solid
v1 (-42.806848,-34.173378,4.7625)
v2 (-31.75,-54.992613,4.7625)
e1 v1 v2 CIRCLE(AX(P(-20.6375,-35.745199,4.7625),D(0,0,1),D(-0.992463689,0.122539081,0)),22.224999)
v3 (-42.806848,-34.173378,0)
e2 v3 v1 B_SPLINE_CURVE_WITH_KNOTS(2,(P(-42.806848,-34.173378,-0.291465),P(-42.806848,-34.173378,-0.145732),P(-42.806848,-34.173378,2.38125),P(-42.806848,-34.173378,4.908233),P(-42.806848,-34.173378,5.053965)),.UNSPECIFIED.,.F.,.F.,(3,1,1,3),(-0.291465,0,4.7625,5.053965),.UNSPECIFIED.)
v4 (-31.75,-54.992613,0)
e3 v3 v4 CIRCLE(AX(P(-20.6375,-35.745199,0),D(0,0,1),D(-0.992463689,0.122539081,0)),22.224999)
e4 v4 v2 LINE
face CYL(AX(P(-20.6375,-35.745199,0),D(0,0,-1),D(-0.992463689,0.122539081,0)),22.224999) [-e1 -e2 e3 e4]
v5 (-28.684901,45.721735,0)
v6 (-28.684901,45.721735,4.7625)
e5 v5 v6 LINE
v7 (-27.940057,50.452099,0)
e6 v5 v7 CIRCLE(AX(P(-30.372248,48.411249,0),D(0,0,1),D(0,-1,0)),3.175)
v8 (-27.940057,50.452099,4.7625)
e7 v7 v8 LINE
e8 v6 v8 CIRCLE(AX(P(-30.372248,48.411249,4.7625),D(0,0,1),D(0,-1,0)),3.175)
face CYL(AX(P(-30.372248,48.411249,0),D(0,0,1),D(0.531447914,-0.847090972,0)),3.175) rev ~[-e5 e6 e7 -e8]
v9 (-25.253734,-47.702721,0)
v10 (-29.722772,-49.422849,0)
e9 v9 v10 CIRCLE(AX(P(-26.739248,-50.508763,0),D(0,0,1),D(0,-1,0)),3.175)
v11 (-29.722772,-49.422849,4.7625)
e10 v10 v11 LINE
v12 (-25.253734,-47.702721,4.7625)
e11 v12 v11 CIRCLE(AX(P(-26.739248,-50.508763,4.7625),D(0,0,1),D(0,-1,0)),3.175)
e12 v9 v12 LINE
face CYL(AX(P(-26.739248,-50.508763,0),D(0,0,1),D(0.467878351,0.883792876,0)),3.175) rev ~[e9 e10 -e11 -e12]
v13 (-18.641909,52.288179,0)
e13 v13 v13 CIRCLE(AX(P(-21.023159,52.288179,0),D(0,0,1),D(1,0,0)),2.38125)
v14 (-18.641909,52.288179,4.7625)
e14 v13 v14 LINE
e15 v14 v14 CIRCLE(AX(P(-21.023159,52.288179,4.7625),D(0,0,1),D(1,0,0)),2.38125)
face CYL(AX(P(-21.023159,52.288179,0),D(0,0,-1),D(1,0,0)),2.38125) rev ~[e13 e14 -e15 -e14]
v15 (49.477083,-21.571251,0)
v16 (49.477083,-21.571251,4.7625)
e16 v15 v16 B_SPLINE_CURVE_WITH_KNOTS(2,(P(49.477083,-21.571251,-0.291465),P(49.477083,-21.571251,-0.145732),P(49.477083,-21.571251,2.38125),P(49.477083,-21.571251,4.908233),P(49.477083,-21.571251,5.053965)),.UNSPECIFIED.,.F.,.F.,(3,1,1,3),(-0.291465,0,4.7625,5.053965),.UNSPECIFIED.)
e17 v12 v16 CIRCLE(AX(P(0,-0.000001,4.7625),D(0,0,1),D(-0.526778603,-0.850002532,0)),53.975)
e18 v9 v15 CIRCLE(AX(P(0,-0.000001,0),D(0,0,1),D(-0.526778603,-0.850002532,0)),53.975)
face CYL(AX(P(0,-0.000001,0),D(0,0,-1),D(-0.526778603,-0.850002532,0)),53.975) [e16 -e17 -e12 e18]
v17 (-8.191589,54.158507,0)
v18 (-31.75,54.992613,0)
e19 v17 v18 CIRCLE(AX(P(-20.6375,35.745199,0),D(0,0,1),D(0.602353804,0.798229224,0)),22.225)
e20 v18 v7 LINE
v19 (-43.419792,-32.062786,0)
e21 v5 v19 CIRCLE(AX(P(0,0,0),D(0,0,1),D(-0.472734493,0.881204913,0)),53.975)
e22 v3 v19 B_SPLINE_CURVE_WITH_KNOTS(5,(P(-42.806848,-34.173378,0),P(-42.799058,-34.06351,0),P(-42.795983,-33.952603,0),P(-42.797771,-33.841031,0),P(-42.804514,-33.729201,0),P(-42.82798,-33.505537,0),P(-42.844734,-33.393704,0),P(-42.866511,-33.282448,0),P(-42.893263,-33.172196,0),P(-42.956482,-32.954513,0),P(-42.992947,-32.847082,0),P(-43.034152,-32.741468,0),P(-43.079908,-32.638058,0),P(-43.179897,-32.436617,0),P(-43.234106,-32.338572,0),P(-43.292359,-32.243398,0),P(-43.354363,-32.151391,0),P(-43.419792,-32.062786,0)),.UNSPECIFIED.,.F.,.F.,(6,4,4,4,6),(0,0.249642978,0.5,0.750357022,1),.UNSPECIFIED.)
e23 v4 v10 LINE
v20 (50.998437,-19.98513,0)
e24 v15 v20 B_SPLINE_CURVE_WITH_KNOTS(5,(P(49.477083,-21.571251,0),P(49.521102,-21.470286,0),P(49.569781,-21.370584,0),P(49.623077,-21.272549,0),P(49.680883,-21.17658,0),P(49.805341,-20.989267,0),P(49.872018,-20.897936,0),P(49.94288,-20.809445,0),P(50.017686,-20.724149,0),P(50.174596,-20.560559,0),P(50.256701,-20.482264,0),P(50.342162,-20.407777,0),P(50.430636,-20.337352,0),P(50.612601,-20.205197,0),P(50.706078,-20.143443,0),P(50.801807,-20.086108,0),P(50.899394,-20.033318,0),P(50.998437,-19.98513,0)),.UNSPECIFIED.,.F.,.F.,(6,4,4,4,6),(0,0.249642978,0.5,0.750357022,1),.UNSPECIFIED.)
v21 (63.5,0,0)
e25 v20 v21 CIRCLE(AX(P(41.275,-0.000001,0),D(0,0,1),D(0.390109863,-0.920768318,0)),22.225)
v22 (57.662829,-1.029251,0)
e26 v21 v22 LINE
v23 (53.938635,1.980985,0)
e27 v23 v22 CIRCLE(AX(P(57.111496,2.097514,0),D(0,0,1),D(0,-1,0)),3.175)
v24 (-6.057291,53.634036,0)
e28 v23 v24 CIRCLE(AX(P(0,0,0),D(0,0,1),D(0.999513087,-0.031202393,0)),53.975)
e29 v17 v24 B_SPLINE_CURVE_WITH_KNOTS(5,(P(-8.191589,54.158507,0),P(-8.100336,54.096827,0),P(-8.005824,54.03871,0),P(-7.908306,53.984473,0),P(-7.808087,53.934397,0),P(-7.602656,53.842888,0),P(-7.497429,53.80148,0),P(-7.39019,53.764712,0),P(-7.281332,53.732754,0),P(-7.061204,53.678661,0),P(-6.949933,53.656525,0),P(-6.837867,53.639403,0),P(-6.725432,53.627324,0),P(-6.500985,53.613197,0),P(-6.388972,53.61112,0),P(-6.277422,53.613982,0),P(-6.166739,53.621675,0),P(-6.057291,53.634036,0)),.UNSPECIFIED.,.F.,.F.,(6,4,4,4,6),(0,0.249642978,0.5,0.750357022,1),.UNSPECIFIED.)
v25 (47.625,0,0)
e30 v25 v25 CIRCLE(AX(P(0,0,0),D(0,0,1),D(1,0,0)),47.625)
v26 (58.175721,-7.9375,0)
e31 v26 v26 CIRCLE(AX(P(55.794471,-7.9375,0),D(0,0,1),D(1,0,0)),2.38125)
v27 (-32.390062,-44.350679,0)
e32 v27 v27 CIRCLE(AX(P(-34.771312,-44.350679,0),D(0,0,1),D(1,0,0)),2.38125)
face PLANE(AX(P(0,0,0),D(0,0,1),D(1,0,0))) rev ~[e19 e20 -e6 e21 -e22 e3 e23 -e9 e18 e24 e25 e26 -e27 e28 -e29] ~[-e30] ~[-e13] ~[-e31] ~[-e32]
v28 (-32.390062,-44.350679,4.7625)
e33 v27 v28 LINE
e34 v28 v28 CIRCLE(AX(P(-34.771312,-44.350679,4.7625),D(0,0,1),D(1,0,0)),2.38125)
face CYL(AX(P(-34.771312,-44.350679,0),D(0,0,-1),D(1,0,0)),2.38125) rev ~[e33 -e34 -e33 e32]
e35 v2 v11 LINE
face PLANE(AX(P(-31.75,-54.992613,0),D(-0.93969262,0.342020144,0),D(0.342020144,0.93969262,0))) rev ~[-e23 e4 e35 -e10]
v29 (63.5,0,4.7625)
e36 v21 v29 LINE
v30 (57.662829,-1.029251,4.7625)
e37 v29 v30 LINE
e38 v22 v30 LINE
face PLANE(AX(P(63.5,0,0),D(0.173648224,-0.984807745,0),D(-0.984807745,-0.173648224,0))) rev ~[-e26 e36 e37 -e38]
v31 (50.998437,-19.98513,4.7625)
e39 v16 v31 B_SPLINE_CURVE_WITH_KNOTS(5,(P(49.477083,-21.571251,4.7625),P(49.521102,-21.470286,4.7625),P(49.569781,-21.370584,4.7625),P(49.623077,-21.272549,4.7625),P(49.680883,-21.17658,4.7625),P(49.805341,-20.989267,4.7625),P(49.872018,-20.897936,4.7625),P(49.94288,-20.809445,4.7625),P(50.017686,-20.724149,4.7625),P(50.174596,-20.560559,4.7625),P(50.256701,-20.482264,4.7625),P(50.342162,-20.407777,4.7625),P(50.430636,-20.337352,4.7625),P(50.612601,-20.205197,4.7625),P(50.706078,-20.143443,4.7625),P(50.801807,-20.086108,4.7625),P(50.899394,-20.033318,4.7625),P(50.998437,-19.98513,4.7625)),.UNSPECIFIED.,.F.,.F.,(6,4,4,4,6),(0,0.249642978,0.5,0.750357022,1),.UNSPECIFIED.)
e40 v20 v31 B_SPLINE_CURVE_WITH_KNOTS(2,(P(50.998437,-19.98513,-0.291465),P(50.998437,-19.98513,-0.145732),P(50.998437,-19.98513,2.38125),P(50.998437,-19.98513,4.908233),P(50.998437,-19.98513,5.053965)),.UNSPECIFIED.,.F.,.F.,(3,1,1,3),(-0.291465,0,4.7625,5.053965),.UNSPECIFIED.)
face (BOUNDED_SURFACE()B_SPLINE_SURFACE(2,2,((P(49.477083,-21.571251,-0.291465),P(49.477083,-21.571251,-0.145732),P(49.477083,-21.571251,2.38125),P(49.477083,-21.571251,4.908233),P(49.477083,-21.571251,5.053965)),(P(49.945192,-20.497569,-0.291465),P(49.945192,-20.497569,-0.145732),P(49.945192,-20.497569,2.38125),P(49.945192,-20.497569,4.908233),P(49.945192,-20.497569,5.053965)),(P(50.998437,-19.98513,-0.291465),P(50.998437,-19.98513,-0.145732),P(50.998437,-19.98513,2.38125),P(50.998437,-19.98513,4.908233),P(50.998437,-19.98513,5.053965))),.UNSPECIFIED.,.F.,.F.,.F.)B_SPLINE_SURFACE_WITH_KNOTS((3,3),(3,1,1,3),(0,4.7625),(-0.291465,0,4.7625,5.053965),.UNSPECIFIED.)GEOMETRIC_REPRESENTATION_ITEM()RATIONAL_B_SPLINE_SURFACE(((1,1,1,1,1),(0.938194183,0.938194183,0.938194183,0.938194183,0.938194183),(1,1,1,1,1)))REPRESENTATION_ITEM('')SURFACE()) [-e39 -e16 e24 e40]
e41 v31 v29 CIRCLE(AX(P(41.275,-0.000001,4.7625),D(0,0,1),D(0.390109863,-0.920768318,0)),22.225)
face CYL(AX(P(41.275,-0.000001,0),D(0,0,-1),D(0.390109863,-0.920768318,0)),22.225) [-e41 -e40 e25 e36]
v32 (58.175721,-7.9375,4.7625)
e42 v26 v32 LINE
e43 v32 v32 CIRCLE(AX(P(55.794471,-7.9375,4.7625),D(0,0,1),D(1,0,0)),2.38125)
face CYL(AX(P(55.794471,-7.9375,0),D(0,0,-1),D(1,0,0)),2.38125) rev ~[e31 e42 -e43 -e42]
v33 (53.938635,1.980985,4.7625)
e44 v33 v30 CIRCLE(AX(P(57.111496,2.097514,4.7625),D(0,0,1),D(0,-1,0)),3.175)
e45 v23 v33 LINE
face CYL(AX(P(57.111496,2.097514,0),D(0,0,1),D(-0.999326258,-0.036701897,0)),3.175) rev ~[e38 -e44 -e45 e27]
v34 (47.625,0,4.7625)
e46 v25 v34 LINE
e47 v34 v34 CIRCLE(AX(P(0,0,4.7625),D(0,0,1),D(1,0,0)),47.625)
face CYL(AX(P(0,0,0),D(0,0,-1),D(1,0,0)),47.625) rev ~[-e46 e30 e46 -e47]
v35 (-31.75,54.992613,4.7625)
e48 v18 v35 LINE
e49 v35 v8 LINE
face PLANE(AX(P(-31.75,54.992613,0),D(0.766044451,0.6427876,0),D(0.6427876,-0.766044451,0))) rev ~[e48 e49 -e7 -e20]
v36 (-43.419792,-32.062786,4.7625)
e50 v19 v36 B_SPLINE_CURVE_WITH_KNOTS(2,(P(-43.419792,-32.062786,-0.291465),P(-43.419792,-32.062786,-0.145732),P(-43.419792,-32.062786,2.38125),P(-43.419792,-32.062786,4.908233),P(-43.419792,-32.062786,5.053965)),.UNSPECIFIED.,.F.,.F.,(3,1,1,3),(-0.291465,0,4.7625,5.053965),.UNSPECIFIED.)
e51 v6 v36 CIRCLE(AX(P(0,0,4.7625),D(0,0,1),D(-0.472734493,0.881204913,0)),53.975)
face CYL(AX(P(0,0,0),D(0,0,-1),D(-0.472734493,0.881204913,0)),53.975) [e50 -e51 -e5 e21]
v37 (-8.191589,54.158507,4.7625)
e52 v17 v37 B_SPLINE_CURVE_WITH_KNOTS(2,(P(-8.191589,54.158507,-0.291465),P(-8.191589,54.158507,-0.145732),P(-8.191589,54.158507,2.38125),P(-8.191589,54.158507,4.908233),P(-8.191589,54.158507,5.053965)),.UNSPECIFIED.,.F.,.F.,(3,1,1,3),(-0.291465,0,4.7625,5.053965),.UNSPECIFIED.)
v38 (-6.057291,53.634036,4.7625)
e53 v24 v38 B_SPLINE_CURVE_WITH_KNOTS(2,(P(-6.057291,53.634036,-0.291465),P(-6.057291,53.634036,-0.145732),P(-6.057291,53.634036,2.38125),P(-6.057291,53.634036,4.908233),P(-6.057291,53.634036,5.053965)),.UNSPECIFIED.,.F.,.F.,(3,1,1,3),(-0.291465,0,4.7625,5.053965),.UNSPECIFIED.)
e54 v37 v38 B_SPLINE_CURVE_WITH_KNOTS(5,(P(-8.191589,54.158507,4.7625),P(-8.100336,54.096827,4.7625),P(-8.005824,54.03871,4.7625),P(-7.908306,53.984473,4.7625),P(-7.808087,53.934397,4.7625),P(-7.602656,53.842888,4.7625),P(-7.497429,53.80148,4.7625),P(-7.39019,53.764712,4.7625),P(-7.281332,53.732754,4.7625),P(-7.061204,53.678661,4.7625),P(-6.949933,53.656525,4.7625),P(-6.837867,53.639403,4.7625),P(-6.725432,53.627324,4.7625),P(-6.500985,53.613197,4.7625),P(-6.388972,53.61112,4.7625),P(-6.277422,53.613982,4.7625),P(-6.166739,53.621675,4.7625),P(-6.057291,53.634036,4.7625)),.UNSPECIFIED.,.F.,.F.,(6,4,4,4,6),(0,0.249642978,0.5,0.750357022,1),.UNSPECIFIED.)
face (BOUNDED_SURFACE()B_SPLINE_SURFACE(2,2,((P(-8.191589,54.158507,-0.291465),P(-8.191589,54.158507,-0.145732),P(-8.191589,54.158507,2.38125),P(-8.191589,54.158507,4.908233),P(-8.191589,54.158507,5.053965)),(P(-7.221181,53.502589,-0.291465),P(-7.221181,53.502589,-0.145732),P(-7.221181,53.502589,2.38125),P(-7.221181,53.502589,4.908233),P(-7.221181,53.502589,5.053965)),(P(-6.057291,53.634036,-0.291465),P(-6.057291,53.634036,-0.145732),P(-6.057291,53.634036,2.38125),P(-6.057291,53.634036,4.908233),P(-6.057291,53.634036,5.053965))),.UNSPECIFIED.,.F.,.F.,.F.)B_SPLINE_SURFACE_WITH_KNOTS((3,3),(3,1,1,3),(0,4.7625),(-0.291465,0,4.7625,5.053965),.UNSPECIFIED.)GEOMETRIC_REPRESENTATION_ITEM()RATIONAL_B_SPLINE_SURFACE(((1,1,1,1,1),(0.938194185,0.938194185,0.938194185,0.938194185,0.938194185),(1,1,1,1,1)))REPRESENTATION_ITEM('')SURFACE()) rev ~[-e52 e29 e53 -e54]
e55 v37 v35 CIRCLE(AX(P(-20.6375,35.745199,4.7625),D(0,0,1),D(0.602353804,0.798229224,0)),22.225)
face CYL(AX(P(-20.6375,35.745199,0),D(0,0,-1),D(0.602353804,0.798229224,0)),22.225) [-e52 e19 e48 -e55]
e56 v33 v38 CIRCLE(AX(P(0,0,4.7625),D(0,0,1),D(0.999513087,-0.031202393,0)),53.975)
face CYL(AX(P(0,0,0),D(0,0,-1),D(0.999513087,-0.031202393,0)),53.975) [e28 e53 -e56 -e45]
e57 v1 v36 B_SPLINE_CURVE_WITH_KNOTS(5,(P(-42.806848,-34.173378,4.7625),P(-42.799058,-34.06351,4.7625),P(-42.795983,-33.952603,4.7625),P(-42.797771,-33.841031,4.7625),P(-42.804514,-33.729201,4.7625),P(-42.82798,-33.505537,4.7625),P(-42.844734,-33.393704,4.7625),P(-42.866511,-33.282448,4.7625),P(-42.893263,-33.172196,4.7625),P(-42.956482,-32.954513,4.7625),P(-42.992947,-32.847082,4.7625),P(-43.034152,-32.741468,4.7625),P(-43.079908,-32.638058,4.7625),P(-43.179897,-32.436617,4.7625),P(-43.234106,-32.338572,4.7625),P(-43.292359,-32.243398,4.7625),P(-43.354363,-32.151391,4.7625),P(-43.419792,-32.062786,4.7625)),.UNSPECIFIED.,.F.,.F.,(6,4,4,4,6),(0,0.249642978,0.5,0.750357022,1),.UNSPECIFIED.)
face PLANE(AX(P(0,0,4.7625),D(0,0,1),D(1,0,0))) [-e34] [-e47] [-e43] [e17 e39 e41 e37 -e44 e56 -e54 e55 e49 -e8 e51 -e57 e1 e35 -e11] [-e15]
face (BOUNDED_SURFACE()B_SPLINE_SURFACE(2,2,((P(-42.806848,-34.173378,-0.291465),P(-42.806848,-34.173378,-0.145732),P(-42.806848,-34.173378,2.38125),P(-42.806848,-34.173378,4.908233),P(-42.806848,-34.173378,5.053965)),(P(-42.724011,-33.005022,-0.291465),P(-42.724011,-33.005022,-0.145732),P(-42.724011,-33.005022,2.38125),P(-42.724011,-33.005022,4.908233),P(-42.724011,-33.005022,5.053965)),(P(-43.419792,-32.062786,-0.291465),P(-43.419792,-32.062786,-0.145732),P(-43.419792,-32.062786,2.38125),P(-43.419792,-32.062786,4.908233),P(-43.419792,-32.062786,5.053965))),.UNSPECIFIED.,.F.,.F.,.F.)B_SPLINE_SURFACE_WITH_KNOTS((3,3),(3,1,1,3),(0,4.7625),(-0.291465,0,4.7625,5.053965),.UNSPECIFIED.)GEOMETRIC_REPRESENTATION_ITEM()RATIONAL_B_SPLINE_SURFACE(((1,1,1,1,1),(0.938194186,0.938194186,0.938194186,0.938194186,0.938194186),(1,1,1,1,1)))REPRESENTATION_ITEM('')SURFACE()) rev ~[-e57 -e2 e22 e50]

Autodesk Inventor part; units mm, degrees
ref_plane "YZ Plane" through (0, 0, 0) normal (1, 0, 0) x (0, 1, 0)
ref_plane "XZ Plane" through (0, 0, 0) normal (0, 1, 0) x (-1, 0, 0)
ref_plane "XY Plane" through (0, 0, 0) normal (0, 0, 1) x (1, 0, 0)
sketch "Sketch1" plane through (0, 0, 0) normal (0, 0, 1) x (1, 0, 0)
  circle A0 centre (0, 0) radius 63.5 construction
  circle A1 centre (0, 0) radius 47.625
  circle A2 centre (0, 0) radius 53.975
  line L0 (0, 0) -> (63.5, 0) construction
  line L1 (63.5, 0) -> (53.948719, -1.684149)
  arc A3 (49.945192, -20.464076) -> (63.5, 0) centre (41.275, 0) ccw
  line L2 (-31.75, 54.992613) -> (-25.515844, 47.563035)
  arc A4 (-7.250187, 53.485843) -> (-31.75, 54.992613) centre (-20.6375, 35.745199) ccw
  line L3 (-31.75, -54.992613) -> (-28.432875, -45.878887)
  arc A5 (-42.695005, -33.021768) -> (-31.75, -54.992613) centre (-20.6375, -35.745199) ccw
  circle A6 centre (25.4, 0) radius 22.225
  circle A7 centre (-11.250284, 22.225) radius 20.6375
  circle A8 centre (-11.250284, 22.225) radius 7.9375
  circle A9 centre (-39.6875, 0) radius 7.9375
  circle A10 centre (19.84375, -34.370383) radius 7.9375
  circle A11 centre (19.84375, 34.370383) radius 7.9375
  circle A12 centre (25.4, 0) radius 2
  circle A13 centre (-11.250284, -22.225) radius 20.6375
  circle A14 centre (-11.250284, -22.225) radius 7.9375
  circle A15 centre (55.794471, -7.9375) radius 2.38125
  circle A16 centre (-21.023159, 52.288179) radius 2.38125
  circle A17 centre (-34.771312, -44.350679) radius 2.38125
  point P0 (-7.250187, 53.485843)
  point P1 (-25.515844, 47.563035)
  point P2 (-42.695005, -33.021768)
  point P3 (-28.432875, -45.878887)
  dimension "Ring_OD" = 127
  dimension "d2" = 6.35
  dimension "d3" = 9.525
  dimension "d15" = 10
  dimension "d16" = 22.225
  dimension "d19" = 360
  dimension "Pulley_OD" = 44.45
  dimension "Brass_OD" = 41.275
  dimension "d41" = 15.875
  dimension "Brass_Offset" = 22.225
  dimension "d43" = 15.875
  dimension "d46" = 360
  dimension "d48" = 4
  dimension "d50" = 4.7625
  dimension "d51" = 7.9375
  dimension "d54" = 360
  dimension "Ring_ID" = 95.25
sketch "Sketch1 outline for Extrusion1" plane through (0, 0, 0) normal (0, 0, 1) x (1, 0, 0)
  arc A0 (49.945192, -20.464076) -> (63.5, 0) centre (41.275, 0) ccw
  arc A1 (-28.432875, -45.878887) -> (49.945192, -20.464076) centre (0, 0) ccw
  line L0 (63.5, 0) -> (53.948719, -1.684149)
  line L1 (-31.75, -54.992613) -> (-28.432875, -45.878887)
  arc A2 (53.948719, -1.684149) -> (-7.250187, 53.485843) centre (0, 0) ccw
  arc A3 (-42.695005, -33.021768) -> (-31.75, -54.992613) centre (-20.6375, -35.745199) ccw
  arc A4 (-7.250187, 53.485843) -> (-31.75, 54.992613) centre (-20.6375, 35.745199) ccw
  arc A5 (-25.515844, 47.563035) -> (-42.695005, -33.021768) centre (0, 0) ccw
  line L2 (-31.75, 54.992613) -> (-25.515844, 47.563035)
  circle A6 centre (-34.771312, -44.350679) radius 2.38125
  circle A7 centre (0, 0) radius 47.625
  circle A8 centre (55.794471, -7.9375) radius 2.38125
  circle A9 centre (-21.023159, 52.288179) radius 2.38125
extrude "Extrusion1" add sketch "Sketch1 outline for Extrusion1" along normal blind 4.7625
fillet "Fillet1" radius 3.175 6 edges at (-7.2502, 53.4858, 2.3813) (-25.5158, 47.563, 2.3813) (53.9487, -1.6841, 2.3813) (49.9452, -20.4641, 2.3813) (-28.4329, -45.8789, 2.3813) (-42.695, -33.0218, 2.3813)
properties part number "Ring Vert Test" material "Steel, Alloy"
